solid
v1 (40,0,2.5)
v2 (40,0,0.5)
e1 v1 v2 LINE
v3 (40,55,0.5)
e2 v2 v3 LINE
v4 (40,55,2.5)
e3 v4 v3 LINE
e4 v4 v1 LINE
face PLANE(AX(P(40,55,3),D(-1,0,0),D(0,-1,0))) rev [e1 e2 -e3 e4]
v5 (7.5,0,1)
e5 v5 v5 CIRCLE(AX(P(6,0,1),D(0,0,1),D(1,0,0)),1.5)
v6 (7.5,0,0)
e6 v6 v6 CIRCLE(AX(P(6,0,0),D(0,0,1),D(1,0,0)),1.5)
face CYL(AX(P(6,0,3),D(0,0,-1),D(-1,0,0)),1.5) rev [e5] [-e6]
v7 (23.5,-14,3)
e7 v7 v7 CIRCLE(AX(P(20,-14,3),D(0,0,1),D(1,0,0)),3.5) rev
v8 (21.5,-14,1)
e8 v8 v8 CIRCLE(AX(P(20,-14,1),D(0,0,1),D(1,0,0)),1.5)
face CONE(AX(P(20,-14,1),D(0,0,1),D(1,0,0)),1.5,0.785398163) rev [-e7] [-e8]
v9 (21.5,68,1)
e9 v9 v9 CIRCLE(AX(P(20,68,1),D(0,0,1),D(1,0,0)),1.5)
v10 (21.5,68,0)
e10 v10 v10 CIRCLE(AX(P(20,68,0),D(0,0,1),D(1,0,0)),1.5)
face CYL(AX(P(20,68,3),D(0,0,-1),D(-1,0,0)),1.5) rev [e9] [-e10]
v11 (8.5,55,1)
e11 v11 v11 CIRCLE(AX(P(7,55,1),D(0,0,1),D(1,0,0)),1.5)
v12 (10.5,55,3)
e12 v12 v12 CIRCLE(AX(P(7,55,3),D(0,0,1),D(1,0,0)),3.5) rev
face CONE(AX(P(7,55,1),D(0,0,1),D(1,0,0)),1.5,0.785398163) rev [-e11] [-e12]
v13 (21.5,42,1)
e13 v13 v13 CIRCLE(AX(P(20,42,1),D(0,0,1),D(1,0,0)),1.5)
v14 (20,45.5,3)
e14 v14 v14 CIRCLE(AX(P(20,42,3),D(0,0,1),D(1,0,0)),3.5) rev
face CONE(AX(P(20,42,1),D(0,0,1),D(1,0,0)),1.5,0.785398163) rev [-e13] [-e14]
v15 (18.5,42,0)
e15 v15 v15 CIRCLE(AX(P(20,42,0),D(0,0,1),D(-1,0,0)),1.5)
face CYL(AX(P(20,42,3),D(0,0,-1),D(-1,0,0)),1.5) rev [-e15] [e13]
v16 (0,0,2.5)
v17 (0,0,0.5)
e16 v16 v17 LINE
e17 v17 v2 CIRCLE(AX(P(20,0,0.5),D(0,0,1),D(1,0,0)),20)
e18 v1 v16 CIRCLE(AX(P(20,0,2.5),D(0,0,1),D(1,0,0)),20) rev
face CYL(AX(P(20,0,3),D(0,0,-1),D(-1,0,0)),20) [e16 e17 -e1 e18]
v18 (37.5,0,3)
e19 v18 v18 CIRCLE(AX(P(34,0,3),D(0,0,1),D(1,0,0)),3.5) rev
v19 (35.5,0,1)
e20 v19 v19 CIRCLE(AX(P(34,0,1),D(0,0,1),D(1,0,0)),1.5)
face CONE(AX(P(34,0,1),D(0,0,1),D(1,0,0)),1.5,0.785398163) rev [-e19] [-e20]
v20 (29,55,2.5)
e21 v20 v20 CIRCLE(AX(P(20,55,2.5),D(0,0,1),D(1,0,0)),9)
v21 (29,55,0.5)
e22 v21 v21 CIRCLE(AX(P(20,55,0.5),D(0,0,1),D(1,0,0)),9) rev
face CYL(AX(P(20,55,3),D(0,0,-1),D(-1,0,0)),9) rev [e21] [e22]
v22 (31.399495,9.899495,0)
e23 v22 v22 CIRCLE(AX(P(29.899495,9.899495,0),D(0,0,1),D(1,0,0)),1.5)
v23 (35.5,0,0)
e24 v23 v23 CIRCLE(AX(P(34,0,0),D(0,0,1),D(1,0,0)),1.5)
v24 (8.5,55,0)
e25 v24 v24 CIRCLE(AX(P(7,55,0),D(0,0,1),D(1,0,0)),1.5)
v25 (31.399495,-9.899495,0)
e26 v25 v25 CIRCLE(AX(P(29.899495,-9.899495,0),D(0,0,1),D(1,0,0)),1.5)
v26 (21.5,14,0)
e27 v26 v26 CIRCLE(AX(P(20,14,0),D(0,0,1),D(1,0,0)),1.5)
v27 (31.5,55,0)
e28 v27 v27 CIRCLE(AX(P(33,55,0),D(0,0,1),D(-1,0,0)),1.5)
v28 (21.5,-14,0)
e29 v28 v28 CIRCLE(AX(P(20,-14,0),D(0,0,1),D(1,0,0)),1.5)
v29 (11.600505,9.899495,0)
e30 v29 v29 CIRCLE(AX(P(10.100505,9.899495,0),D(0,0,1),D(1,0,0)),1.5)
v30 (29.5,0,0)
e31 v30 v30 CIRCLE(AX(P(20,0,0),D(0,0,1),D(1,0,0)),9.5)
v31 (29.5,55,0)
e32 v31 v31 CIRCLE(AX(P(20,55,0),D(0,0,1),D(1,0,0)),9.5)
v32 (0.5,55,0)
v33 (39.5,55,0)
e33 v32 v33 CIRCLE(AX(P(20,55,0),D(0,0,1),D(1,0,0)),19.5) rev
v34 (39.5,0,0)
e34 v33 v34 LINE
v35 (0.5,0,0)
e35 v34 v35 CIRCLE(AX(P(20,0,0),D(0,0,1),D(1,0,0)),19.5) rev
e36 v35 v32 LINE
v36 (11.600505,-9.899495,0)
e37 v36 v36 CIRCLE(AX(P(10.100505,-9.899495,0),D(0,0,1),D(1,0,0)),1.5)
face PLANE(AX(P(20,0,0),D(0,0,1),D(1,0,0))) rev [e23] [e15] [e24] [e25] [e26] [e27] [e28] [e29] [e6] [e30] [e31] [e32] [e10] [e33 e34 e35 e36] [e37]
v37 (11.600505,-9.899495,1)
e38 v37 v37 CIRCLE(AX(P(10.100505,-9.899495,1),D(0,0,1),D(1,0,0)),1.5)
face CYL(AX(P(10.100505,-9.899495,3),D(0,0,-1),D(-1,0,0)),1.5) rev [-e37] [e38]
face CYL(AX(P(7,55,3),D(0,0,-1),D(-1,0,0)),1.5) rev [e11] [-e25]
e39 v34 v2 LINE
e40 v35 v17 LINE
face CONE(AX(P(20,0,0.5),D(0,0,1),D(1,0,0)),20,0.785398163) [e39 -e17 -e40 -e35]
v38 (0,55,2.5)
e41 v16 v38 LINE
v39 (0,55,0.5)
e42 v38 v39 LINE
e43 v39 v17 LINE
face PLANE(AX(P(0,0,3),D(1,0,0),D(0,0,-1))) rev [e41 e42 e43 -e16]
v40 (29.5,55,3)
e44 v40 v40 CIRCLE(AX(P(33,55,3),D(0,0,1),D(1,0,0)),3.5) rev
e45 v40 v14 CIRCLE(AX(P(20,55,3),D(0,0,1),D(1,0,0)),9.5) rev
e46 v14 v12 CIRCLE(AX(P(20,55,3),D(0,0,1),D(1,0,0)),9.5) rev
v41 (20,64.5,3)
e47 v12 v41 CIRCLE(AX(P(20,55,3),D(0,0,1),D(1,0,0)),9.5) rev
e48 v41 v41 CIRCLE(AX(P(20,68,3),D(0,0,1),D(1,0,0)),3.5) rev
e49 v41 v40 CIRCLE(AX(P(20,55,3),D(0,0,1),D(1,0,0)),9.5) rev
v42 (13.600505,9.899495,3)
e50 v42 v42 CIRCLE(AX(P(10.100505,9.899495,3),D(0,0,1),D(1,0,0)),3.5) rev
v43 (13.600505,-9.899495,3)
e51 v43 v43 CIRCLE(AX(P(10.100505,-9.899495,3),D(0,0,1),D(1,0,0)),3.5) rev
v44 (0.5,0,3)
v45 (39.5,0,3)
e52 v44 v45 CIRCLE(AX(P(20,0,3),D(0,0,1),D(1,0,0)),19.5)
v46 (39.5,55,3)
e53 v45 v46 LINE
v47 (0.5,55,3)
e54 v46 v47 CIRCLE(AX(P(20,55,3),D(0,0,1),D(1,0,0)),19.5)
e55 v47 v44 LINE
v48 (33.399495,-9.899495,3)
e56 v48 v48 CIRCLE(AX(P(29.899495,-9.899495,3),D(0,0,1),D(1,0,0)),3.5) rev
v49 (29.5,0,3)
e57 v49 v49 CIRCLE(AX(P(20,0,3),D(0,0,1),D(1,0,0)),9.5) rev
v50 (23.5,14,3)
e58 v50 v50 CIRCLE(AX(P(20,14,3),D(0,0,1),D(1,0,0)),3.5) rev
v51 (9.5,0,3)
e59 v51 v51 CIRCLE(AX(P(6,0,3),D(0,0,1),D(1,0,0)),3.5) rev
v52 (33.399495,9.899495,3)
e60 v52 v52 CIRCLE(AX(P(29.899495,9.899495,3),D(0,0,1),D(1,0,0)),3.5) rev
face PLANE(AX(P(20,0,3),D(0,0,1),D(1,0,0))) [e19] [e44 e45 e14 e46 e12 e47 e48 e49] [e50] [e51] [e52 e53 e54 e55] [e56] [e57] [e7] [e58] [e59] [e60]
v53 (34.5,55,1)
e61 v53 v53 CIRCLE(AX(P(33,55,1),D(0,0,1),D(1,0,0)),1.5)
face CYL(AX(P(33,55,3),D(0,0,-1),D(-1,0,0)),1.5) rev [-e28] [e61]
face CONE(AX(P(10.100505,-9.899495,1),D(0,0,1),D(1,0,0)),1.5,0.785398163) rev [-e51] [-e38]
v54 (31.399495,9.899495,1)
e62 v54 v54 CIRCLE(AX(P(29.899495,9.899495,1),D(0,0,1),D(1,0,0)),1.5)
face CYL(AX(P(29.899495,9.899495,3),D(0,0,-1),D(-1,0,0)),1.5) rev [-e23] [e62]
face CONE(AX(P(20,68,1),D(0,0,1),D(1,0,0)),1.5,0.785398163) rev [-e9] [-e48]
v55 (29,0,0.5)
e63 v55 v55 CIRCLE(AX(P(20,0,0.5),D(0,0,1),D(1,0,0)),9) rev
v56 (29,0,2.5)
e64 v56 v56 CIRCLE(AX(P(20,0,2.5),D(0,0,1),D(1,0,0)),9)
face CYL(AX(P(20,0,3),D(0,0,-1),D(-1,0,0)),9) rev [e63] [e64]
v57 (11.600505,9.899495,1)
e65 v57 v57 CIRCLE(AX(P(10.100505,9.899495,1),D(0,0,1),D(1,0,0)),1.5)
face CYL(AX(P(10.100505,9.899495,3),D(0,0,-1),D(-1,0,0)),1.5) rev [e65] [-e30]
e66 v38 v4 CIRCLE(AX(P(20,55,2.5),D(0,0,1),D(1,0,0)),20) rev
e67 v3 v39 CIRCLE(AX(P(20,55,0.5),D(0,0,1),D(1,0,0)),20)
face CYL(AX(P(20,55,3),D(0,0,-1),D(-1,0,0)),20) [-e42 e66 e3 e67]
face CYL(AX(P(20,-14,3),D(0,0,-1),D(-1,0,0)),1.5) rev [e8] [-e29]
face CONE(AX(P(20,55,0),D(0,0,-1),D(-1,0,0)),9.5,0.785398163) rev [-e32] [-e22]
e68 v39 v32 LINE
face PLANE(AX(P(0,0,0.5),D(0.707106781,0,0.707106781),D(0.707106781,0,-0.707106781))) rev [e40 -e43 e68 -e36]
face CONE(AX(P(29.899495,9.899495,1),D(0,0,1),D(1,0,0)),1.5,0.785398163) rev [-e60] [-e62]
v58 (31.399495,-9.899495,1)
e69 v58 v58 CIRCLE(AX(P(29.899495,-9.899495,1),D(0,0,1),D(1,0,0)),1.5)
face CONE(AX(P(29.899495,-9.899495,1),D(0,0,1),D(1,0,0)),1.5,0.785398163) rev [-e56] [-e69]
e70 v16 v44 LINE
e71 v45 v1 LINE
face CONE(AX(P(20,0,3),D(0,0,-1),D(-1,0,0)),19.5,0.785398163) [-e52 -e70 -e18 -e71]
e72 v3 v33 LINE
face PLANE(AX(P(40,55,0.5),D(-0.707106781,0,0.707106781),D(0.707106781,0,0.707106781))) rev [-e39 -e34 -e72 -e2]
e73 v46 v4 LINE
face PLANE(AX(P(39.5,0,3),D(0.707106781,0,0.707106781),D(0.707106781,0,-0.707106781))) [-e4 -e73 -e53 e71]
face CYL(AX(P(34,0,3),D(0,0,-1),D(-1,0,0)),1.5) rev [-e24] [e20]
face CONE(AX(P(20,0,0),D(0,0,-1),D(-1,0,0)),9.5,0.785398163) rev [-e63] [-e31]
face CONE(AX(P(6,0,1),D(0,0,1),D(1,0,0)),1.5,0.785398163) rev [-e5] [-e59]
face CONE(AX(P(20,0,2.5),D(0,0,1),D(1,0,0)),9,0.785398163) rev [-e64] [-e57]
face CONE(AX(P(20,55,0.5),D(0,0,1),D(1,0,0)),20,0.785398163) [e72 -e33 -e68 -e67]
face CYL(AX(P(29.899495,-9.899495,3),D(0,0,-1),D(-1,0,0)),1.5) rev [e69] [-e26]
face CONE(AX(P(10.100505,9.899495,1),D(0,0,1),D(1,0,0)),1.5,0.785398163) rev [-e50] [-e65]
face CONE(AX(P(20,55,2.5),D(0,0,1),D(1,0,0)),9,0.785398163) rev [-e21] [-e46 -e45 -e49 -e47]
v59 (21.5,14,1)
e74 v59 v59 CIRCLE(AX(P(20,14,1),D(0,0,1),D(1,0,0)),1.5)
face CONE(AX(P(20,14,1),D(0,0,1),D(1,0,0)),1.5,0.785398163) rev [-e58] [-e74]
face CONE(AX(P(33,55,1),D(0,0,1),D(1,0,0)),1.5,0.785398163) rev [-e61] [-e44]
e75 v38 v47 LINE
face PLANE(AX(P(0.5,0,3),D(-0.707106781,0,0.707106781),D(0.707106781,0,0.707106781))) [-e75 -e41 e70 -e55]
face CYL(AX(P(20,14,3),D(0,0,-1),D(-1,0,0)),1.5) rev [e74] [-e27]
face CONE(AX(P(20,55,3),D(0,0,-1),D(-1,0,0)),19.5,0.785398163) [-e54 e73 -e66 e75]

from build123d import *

# Parameters (mm, degrees)
ESQUISSE1_R      = 9
ESQUISSE1_R_2    = 1.5
EXTRUSION1_DEPTH = 3
CHANFREIN1_SIZE  = 2
CHANFREIN2_SIZE  = 0.5


with BuildPart() as part:
    # Esquisse1 → Extrusion1 (new body)
    with BuildSketch(Plane.XY):
        with BuildLine():
            Line((0, 0), (0, 55))
            ThreePointArc((0, 55), (20, 75), (40, 55))
            Line((40, 55), (40, 0))
            ThreePointArc((40, 0), (20, -20), (0, 0))
        make_face()
        with Locations((20, 55)):
            Circle(ESQUISSE1_R, mode=Mode.SUBTRACT)
        with Locations((20, 0)):
            Circle(ESQUISSE1_R, mode=Mode.SUBTRACT)
        with Locations((20, 68)):
            Circle(ESQUISSE1_R_2, mode=Mode.SUBTRACT)
        with Locations(Location((20, 42, 0), (0, 0, 180))):
            Circle(ESQUISSE1_R_2, mode=Mode.SUBTRACT)
        with Locations((7, 55)):
            Circle(ESQUISSE1_R_2, mode=Mode.SUBTRACT)
        with Locations(Location((33, 55, 0), (0, 0, 180))):
            Circle(ESQUISSE1_R_2, mode=Mode.SUBTRACT)
        with Locations((10.100505063, 9.899494937)):
            Circle(ESQUISSE1_R_2, mode=Mode.SUBTRACT)
        with Locations((6, 0)):
            Circle(ESQUISSE1_R_2, mode=Mode.SUBTRACT)
        with Locations((10.100505063, -9.899494937)):
            Circle(ESQUISSE1_R_2, mode=Mode.SUBTRACT)
        with Locations((20, -14)):
            Circle(ESQUISSE1_R_2, mode=Mode.SUBTRACT)
        with Locations((29.899494937, -9.899494937)):
            Circle(ESQUISSE1_R_2, mode=Mode.SUBTRACT)
        with Locations((34, 0)):
            Circle(ESQUISSE1_R_2, mode=Mode.SUBTRACT)
        with Locations((29.899494937, 9.899494937)):
            Circle(ESQUISSE1_R_2, mode=Mode.SUBTRACT)
        with Locations((20, 14)):
            Circle(ESQUISSE1_R_2, mode=Mode.SUBTRACT)
    extrude(amount=EXTRUSION1_DEPTH)

    # Chanfrein1
    chanfrein1_edges = [part.edges().sort_by_distance(p)[0] for p in [
        (18.5, 68, 3),
        (21.5, 42, 3),
        (5.5, 55, 3),
        (34.5, 55, 3),
        (8.600505063, 9.899494937, 3),
        (4.5, 0, 3),
        (8.600505063, -9.899494937, 3),
        (18.5, -14, 3),
        (28.399494937, -9.899494937, 3),
        (32.5, 0, 3),
        (28.399494937, 9.899494937, 3),
        (18.5, 14, 3),
    ]]
    chamfer(chanfrein1_edges, length=CHANFREIN1_SIZE)

    # Chanfrein2
    chanfrein2_edges = [part.edges().sort_by_distance(p)[0] for p in [
        (20, 75, 3),
        (11, 55, 0),
        (11, 55, 3),
        (0, 27.5, 3),
        (11, 0, 0),
        (11, 0, 3),
        (20, -20, 3),
        (0, 27.5, 0),
        (20, 75, 0),
        (40, 27.5, 0),
        (20, -20, 0),
        (40, 27.5, 3),
    ]]
    chamfer(chanfrein2_edges, length=CHANFREIN2_SIZE - 0.0001)  # a hair under: the kernel refuses the full size


solid = part.part
